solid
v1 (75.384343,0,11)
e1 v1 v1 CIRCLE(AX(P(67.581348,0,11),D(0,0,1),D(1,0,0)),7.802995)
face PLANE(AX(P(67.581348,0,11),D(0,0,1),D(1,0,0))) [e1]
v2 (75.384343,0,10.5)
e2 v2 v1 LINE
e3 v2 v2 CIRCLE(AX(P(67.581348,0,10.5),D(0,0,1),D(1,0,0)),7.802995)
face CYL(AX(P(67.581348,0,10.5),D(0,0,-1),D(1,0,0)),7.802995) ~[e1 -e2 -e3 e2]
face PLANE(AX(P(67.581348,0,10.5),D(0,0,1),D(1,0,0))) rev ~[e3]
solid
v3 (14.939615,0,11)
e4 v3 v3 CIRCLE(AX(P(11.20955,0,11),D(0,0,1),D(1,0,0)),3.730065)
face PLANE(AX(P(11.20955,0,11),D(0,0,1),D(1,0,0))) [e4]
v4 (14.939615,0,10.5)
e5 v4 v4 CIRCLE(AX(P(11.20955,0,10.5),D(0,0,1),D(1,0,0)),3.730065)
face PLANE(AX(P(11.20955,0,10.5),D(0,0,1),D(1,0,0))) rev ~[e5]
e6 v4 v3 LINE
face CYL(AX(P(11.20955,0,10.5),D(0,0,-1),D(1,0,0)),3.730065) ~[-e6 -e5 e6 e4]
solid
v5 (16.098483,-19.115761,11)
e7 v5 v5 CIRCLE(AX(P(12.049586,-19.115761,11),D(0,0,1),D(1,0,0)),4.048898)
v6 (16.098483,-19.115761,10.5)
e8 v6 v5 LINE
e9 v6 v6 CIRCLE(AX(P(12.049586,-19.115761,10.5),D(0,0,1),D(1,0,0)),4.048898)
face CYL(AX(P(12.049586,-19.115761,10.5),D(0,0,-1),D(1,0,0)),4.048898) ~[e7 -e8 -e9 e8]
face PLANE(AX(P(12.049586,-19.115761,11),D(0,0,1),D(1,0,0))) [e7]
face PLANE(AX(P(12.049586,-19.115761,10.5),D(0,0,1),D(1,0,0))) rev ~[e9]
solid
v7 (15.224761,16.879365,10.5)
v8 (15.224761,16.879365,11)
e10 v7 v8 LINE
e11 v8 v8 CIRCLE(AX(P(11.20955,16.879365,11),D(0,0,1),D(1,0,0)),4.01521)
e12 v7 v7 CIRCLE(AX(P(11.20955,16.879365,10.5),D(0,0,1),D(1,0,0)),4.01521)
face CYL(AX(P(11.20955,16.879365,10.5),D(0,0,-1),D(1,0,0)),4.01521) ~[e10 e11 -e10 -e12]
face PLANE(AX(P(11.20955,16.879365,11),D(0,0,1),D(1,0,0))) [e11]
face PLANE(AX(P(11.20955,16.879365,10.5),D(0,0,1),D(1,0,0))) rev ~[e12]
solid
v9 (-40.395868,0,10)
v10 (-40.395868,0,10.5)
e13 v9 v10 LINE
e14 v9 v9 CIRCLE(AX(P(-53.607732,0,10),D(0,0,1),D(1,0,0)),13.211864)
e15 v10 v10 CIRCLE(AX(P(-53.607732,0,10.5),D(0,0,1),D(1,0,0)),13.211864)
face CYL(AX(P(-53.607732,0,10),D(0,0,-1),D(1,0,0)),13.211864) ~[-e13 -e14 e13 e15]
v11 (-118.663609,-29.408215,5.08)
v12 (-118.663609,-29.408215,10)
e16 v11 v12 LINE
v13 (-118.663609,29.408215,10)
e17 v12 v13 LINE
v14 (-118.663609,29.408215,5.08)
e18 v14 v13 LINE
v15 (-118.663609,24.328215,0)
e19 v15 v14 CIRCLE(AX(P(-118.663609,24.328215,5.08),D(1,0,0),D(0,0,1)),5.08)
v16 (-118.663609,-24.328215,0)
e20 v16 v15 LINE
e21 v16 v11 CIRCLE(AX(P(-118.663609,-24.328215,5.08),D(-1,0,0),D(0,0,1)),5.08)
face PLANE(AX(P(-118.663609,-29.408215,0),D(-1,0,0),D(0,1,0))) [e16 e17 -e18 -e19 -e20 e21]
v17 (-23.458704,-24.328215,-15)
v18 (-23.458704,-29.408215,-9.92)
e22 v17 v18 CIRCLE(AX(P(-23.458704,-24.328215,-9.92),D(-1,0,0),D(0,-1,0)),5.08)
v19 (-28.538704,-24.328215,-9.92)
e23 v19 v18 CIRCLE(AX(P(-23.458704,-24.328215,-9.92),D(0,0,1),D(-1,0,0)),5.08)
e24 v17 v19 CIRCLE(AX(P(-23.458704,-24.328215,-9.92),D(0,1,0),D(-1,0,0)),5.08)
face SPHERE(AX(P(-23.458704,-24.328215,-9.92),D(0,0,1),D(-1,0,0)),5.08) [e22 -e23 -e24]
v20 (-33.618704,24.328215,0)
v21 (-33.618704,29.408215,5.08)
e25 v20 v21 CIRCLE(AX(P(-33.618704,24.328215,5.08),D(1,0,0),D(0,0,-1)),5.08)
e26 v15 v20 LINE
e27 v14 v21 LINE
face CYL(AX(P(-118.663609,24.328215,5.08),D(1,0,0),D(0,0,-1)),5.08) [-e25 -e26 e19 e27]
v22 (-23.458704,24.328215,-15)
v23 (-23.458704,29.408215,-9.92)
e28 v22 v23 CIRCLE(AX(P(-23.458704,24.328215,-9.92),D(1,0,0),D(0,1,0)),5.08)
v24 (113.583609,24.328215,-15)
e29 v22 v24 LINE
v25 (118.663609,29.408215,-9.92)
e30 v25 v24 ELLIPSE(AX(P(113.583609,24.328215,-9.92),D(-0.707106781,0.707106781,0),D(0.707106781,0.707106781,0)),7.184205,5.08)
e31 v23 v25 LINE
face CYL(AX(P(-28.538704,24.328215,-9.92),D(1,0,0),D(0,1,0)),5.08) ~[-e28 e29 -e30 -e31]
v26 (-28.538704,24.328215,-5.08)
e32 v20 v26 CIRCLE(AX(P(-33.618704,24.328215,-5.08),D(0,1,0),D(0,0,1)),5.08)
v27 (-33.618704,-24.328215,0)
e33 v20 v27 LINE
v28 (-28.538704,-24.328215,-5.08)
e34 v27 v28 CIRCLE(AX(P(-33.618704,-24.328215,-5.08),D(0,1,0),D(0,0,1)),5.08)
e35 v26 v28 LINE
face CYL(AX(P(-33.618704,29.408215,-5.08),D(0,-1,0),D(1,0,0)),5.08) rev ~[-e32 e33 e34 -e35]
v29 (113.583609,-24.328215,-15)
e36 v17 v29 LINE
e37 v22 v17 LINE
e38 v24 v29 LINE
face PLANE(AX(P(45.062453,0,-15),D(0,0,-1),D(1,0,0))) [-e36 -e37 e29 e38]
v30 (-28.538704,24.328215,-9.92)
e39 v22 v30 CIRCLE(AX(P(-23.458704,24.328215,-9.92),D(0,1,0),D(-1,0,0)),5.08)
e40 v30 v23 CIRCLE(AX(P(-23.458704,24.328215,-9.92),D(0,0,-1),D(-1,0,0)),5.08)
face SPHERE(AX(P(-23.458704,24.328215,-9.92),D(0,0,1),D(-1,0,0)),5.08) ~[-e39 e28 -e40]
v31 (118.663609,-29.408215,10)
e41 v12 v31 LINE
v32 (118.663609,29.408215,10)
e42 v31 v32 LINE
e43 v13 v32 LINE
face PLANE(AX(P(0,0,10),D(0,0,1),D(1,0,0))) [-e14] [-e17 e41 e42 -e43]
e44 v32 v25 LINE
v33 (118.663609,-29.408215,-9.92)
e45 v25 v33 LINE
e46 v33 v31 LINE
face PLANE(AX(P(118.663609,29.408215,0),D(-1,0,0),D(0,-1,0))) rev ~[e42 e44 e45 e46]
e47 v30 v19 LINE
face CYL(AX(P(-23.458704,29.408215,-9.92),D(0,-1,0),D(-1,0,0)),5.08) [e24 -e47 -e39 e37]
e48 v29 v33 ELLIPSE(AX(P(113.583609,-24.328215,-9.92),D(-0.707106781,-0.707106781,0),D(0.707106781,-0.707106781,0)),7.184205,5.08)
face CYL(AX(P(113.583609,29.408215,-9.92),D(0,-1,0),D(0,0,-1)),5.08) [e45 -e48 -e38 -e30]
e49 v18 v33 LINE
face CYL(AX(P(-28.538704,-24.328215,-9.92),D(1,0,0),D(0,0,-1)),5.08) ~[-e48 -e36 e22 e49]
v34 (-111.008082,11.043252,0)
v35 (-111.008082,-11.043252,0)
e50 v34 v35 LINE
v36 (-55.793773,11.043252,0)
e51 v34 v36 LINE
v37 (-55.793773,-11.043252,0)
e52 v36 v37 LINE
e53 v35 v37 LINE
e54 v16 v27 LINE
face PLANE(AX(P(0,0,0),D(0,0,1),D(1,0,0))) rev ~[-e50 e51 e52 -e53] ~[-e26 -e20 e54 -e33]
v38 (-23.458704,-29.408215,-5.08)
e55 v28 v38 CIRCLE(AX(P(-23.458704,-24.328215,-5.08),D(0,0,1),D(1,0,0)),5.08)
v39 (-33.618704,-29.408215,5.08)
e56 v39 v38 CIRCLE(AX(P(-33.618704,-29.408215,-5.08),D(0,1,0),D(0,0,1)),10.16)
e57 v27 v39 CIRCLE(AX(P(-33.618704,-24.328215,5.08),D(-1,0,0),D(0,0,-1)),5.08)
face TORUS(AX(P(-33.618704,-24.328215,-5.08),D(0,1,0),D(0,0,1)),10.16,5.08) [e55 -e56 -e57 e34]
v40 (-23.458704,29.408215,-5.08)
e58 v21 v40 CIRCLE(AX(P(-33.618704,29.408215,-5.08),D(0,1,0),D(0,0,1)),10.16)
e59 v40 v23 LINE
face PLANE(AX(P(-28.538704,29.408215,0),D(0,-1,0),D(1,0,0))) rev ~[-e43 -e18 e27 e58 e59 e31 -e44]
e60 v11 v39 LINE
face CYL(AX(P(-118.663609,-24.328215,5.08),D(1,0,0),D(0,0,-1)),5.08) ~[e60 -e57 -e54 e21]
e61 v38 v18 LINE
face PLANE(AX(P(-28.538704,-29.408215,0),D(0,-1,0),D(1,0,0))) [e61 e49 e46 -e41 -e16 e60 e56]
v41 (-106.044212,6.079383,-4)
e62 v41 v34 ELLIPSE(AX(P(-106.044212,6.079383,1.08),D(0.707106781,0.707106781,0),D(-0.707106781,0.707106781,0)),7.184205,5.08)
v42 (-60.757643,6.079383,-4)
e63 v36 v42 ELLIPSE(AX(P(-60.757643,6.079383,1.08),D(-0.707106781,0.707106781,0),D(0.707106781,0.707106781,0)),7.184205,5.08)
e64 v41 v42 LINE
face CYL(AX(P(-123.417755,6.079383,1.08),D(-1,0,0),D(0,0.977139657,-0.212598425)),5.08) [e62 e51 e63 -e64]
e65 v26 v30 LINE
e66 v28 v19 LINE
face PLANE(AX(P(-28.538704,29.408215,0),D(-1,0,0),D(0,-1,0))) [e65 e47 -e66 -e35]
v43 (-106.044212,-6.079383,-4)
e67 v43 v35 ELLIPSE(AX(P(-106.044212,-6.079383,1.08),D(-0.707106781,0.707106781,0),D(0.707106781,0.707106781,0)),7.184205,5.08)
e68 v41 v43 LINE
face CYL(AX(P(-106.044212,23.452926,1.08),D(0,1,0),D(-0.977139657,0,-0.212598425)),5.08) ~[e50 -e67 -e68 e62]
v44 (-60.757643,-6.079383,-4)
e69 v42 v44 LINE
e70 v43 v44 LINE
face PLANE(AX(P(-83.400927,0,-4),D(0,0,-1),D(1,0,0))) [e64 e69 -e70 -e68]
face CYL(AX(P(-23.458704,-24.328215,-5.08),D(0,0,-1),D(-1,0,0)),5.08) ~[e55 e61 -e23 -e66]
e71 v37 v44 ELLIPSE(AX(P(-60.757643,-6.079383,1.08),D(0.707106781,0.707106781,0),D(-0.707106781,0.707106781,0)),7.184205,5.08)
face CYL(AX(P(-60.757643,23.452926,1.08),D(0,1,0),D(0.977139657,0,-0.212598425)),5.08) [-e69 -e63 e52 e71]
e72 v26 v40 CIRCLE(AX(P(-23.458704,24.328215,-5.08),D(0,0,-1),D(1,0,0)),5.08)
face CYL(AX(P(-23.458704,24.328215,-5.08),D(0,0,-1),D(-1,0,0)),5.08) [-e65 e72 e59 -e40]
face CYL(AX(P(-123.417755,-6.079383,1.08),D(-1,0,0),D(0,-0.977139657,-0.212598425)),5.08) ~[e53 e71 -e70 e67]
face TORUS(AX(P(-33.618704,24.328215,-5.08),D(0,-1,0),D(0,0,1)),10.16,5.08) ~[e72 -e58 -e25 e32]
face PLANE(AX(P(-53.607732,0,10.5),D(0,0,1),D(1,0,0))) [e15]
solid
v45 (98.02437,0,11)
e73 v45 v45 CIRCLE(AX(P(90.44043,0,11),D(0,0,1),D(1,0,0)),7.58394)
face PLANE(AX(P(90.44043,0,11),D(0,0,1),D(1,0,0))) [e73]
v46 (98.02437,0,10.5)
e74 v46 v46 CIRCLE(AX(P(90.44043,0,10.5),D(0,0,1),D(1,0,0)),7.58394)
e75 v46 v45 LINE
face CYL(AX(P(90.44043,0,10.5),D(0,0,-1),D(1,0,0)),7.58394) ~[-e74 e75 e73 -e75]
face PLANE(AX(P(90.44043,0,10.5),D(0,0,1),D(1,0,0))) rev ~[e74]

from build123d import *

# Parameters (mm, degrees)
F0_W        = 237.3272180557
F0_H        = 58.8164292276
F1_DEPTH    = 10
F2_W        = 147.2023129463
F2_H        = 58.8164292276
F3_DEPTH    = 15
F4_F1_R     = 5.08
F4_F2_R     = 5.08
F5_W        = 55.2143082023
F5_H        = 22.0865048468
F6_DEPTH    = 4
F7_T1_DEPTH = 46.9058521388
F7_T3_DEPTH = 80.0336554942
F9_R        = 13.2118644906
F10_DEPTH   = 0.5
F11_R       = 4.0488978151
F12_DEPTH   = 0.5
F11_R_2     = 3.7300649458
F11_R_3     = 4.0152102199
F11_R_4     = 7.8029945449
F11_R_5     = 7.5839402098


# Not quite as in the source:
# - a fillet or chamfer that OpenCascade refuses, or shapes differently, is made with other operations: its cross-section is extruded or revolved along the edge and cut away or added


with BuildPart() as f1:
    # F0 (on Top) → F1 (new body)
    with BuildSketch(Plane.XY):
        Rectangle(F0_W, F0_H)
    extrude(amount=F1_DEPTH)

    # F2 (on face) → F3 (join)
    with BuildSketch(Plane(origin=(0, 0, 0), x_dir=(1, 0, 0), z_dir=(0, 0, -1))):
        with Locations((45.0624525547, 0)):
            Rectangle(F2_W, F2_H)
    extrude(amount=F3_DEPTH)

    # F4: fillet of radius 5.08 on 7 edges, made by hand

    # F4_f1
    f4_f1_edges = [f1.edges().sort_by_distance(p)[0] for p in [
        (-28.5387039185, 0, 0),
    ]]
    fillet(f4_f1_edges, radius=F4_F1_R)

    # F4_f2
    f4_f2_edges = [f1.edges().sort_by_distance(p)[0] for p in [
        (-28.5387039185, -29.4082146138, -10.04),
        (-28.5387039185, 29.4082146138, -10.04),
        (-28.5387039185, 0, -15),
        (45.0624525547, 29.4082146138, -15),
        (118.6636090279, 0, -15),
        (45.0624525547, -29.4082146138, -15),
        (-30.02660147, 29.4082146138, -1.4878975516),
        (-30.02660147, -29.4082146138, -1.4878975516),
    ]]
    fillet(f4_f2_edges, radius=F4_F2_R)

    # F5 (on face) → F6 (join)
    with BuildSketch(Plane(origin=(0, 0, 0), x_dir=(1, 0, 0), z_dir=(0, 0, -1))):
        with Locations((-83.400927484, 0)):
            Rectangle(F5_W, F5_H)
    extrude(amount=F6_DEPTH)

    # F7: fillet of radius 5.08 on 4 edges, made by hand

    # F7_s2 → F7_t1 (cut)
    with BuildSketch(Plane.XZ.offset(-23.4529260694)):
        with BuildLine():
            ThreePointArc((-55.7937733829, 0), (-57.5701673512, -2.8755530587), (-60.7576428413, -4))
            Line((-60.7576428413, -4), (-55.7937733829, -4))
            Line((-55.7937733829, -4), (-55.7937733829, 0))
        make_face()
        with BuildLine():
            ThreePointArc((-111.0080815852, 0), (-109.2316876169, -2.8755530587), (-106.0442121268, -4))
            Line((-106.0442121268, -4), (-111.0080815852, -4))
            Line((-111.0080815852, -4), (-111.0080815852, 0))
        make_face()
    extrude(amount=F7_T1_DEPTH, mode=Mode.SUBTRACT)

    # F7_s4 → F7_t3 (cut)
    with BuildSketch(Plane.YZ.offset(-123.4177552312)):
        with BuildLine():
            ThreePointArc((-11.0432524234, 0), (-9.2668584551, -2.8755530587), (-6.079382965, -4))
            Line((-6.079382965, -4), (-11.0432524234, -4))
            Line((-11.0432524234, -4), (-11.0432524234, 0))
        make_face()
        with BuildLine():
            ThreePointArc((11.0432524234, 0), (9.2668584551, -2.8755530587), (6.079382965, -4))
            Line((6.079382965, -4), (11.0432524234, -4))
            Line((11.0432524234, -4), (11.0432524234, 0))
        make_face()
    extrude(amount=F7_T3_DEPTH, mode=Mode.SUBTRACT)

    # F9 (on face) → F10 (join)
    with BuildSketch(Plane.XY.offset(10)):
        with Locations((-53.6077320576, 0)):
            Circle(F9_R)
    extrude(amount=F10_DEPTH)


with BuildPart() as f12:
    # F11 (on face) → F12 (new body)
    with BuildSketch(Plane.XY.offset(10.5)):
        with Locations((12.0495855808, -19.1157609224)):
            Circle(F11_R)
    extrude(amount=F12_DEPTH)


with BuildPart() as f12b:
    # F11 (on face) → F12, piece 2 (new body)
    with BuildSketch(Plane.XY.offset(10.5)):
        with Locations((11.2095503137, 0)):
            Circle(F11_R_2)
    extrude(amount=F12_DEPTH)


with BuildPart() as f12c:
    # F11 (on face) → F12, piece 3 (new body)
    with BuildSketch(Plane.XY.offset(10.5)):
        with Locations((11.2095503137, 16.8793648481)):
            Circle(F11_R_3)
    extrude(amount=F12_DEPTH)


with BuildPart() as f12d:
    # F11 (on face) → F12, piece 4 (new body)
    with BuildSketch(Plane.XY.offset(10.5)):
        with Locations((67.5813481212, 0)):
            Circle(F11_R_4)
    extrude(amount=F12_DEPTH)


with BuildPart() as f12e:
    # F11 (on face) → F12, piece 5 (new body)
    with BuildSketch(Plane.XY.offset(10.5)):
        with Locations((90.4404297471, 0)):
            Circle(F11_R_5)
    extrude(amount=F12_DEPTH)


solid = Compound([f1.part, f12.part, f12b.part, f12c.part, f12d.part, f12e.part])
